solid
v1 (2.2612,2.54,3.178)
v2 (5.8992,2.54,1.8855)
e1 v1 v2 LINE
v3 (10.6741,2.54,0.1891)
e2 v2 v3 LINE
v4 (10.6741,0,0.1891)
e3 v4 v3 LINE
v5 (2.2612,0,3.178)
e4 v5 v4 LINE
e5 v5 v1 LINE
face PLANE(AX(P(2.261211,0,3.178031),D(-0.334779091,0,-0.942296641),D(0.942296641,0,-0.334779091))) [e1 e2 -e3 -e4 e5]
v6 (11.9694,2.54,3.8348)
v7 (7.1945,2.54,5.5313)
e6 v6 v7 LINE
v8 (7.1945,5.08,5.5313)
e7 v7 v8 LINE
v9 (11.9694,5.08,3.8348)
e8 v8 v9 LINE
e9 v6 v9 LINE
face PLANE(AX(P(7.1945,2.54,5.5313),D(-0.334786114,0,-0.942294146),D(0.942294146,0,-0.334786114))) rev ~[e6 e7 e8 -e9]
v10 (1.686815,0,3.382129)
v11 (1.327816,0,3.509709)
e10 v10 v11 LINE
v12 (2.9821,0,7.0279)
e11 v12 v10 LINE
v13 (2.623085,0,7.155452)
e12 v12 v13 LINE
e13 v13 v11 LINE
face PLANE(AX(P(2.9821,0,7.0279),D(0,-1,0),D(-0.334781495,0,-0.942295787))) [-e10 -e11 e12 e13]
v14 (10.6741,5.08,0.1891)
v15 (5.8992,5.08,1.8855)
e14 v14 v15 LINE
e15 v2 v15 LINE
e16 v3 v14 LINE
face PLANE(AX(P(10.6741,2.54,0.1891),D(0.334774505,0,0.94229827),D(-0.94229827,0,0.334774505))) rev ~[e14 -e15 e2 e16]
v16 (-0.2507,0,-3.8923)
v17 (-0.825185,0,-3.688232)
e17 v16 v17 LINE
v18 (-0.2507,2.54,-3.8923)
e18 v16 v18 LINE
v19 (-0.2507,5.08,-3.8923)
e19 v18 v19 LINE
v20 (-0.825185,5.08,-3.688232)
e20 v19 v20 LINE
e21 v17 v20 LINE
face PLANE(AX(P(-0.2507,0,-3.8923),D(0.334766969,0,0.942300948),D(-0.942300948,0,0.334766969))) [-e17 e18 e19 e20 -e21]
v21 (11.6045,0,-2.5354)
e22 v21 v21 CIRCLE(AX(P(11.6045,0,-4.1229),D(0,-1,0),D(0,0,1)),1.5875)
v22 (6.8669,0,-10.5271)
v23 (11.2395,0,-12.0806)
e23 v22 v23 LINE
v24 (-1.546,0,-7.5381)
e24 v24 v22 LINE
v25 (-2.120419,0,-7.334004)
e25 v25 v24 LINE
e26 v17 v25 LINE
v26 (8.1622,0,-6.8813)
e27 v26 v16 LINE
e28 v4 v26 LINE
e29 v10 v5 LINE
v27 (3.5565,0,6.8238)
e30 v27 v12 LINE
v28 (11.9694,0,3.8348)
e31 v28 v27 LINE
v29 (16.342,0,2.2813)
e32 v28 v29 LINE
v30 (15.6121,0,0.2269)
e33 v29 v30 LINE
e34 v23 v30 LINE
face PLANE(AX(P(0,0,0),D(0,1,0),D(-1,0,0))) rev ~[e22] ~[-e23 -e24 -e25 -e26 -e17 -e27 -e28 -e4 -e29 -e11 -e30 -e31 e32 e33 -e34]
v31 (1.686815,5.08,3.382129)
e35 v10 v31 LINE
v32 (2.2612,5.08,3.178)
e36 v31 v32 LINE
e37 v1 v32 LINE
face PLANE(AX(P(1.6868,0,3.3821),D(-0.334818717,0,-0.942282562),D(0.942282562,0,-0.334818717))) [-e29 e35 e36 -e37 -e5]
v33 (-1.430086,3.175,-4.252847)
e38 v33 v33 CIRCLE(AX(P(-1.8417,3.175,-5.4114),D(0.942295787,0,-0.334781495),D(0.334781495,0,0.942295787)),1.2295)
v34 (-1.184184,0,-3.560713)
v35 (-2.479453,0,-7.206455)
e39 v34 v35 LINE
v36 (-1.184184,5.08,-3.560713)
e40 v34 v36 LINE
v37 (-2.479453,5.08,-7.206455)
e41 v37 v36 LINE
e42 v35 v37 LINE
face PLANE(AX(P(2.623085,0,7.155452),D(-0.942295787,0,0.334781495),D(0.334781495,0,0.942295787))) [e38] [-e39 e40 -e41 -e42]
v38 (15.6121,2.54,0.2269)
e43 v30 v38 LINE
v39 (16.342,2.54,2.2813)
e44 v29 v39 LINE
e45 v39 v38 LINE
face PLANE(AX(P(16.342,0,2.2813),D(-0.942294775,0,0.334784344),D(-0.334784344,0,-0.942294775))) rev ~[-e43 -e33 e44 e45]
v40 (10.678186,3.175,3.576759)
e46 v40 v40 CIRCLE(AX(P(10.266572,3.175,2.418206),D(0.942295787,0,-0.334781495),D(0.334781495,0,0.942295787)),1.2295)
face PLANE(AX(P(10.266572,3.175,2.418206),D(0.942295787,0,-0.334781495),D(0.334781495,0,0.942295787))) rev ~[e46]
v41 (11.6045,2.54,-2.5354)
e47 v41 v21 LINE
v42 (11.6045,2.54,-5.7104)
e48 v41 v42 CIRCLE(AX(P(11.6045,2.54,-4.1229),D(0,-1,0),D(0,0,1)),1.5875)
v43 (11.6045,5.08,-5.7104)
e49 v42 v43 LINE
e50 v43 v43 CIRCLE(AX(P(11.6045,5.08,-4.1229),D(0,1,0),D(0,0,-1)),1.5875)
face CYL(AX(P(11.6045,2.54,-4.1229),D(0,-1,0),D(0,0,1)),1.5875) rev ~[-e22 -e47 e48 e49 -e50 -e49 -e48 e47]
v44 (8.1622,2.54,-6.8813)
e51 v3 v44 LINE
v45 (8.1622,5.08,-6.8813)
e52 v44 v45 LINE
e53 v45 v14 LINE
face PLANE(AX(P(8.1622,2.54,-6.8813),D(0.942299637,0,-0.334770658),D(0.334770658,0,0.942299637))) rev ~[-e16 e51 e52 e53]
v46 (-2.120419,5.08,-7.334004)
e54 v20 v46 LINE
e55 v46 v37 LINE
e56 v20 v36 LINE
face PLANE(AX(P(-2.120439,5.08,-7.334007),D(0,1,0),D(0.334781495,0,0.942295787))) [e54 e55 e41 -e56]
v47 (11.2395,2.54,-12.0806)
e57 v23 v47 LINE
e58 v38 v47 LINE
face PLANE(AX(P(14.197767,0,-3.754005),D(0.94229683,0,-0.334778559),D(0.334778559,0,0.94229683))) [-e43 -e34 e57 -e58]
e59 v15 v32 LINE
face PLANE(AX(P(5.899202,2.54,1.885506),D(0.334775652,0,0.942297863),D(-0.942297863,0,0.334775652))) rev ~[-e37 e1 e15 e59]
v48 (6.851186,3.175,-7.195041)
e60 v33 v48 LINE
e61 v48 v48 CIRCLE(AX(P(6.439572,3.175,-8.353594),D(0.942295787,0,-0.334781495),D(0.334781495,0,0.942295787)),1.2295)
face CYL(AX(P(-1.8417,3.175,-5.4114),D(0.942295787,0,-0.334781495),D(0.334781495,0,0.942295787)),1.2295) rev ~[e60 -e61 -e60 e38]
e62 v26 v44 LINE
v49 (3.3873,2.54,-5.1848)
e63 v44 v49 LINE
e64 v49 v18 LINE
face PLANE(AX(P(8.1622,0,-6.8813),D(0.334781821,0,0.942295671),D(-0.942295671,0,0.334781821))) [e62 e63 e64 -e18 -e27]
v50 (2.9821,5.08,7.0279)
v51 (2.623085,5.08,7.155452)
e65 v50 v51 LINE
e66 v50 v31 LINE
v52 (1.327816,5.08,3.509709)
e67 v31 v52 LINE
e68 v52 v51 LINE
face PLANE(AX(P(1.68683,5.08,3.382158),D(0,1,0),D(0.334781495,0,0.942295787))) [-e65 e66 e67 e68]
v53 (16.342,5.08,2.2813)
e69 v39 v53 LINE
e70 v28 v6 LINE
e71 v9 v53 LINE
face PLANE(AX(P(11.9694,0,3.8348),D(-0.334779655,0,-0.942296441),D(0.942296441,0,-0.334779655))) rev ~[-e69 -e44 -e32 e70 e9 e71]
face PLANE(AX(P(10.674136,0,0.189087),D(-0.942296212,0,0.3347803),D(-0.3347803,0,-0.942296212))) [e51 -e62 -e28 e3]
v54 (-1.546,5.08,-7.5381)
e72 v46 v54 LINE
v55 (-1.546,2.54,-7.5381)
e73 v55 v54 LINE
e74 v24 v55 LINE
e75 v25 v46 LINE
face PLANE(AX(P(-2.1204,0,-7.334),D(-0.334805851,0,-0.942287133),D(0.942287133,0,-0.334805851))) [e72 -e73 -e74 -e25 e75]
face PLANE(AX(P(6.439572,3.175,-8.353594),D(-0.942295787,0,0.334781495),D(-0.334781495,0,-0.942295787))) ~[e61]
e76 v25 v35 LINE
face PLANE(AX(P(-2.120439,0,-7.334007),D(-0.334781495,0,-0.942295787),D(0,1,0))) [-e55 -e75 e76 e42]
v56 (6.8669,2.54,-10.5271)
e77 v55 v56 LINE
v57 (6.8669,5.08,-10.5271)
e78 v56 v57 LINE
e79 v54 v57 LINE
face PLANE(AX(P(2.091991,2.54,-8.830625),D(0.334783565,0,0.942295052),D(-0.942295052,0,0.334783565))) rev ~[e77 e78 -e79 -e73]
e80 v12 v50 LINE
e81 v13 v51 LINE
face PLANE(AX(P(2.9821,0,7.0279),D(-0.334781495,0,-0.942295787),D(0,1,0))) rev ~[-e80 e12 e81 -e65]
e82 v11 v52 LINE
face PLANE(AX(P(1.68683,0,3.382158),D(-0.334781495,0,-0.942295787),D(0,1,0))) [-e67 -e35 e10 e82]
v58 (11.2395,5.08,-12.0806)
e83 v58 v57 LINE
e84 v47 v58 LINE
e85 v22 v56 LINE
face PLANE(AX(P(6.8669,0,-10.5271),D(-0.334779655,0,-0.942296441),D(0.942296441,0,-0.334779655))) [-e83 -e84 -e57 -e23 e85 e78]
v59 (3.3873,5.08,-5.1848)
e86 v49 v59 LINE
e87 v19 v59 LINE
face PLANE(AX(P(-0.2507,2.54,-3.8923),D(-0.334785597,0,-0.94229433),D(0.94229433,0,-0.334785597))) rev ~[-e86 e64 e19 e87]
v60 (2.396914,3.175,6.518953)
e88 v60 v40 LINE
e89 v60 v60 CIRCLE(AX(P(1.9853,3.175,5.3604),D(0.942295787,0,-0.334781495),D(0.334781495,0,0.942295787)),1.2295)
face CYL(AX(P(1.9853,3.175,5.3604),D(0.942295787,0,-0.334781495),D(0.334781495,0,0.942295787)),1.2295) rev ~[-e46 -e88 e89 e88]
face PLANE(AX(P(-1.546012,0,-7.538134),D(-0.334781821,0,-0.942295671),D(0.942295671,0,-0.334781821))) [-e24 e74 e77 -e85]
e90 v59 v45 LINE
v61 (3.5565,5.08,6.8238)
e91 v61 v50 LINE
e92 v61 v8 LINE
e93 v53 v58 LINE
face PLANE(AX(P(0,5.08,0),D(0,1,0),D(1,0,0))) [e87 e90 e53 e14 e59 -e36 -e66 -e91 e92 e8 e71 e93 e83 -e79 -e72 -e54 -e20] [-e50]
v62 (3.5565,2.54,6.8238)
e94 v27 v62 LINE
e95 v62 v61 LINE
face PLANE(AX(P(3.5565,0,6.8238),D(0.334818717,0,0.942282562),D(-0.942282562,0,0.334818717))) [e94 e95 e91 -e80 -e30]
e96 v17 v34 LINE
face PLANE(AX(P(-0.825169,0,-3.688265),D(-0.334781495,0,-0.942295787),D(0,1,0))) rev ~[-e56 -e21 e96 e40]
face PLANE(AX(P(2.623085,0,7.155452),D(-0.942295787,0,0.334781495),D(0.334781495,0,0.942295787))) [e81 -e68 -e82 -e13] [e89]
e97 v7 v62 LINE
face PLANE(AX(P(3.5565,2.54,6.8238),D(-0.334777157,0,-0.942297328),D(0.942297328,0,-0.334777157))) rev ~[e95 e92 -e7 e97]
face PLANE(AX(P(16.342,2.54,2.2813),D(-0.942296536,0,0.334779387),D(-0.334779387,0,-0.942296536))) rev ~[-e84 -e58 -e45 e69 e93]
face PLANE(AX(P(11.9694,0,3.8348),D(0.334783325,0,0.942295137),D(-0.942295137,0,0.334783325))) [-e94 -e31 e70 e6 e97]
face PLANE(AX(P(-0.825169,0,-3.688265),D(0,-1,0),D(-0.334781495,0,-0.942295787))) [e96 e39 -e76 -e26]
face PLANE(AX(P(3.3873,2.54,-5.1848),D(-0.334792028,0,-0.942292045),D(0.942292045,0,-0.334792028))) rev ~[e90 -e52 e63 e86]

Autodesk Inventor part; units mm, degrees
ref_plane "YZ Plane" through (0, 0, 0) normal (1, 0, 0) x (0, 1, 0)
ref_plane "XZ Plane" through (0, 0, 0) normal (0, 1, 0) x (-1, 0, 0)
ref_plane "XY Plane" through (0, 0, 0) normal (0, 0, 1) x (1, 0, 0)
sketch "Sketch1" plane through (0, 0, 0) normal (0, 1, 0) x (-1, 0, 0)
  line L0 (6.5094, 9.5985) -> (7.4635, 6.913)
  line L1 (10.1521, -0.6544) -> (11.1062, -3.34)
  line L2 (-11.9694, 3.8348) -> (7.7922, 10.8558)
  line L3 (9.0875, 7.21) -> (-10.6741, 0.1891)
  line L4 (-8.1622, -6.8813) -> (11.5995, 0.1397)
  line L5 (12.8948, -3.5061) -> (-6.8669, -10.5271)
  line L6 (-6.8669, -10.5271) -> (-8.1622, -6.8813)
  line L7 (11.5995, 0.1397) -> (12.8948, -3.5061)
  line L8 (7.7922, 10.8558) -> (9.0875, 7.21)
  line L9 (-10.6741, 0.1891) -> (-11.9694, 3.8348)
  line L10 (6.9865, 8.2558) -> (-11.2395, 1.7804)
  line L11 (10.6292, -1.9972) -> (-7.5968, -8.4726)
  circle A0 centre (-12.8288, -4.5578) radius 1.5875
  line L12 (-12.8288, -4.5578) -> (-11.2395, 1.7804)
  line L13 (-7.5968, -8.4726) -> (-12.8288, -4.5578)
  line L14 (-11.2395, 1.7804) -> (-7.5968, -8.4726)
  line L15 (-6.8669, -10.5271) -> (-11.2395, -12.0806)
  line L16 (-11.2395, -12.0806) -> (-15.6121, 0.2269)
  line L17 (-15.6121, 0.2269) -> (-11.2395, 1.7804)
  line L18 (6.5094, 9.5985) -> (-11.7166, 3.1231)
  line L19 (7.4635, 6.913) -> (-10.7624, 0.4376)
  line L20 (10.1521, -0.6544) -> (-8.0739, -7.1298)
  line L21 (11.1062, -3.34) -> (-7.1197, -9.8154)
  line L22 (11.645, -4.8563) -> (9.3537, 1.5929)
  line L23 (-11.9694, 3.8348) -> (-16.342, 2.2813)
  line L24 (-16.342, 2.2813) -> (-15.6121, 0.2269)
  line L25 (-11.9694, 3.8348) -> (-11.2395, 1.7804)
  line L26 (6.9865, 8.2558) -> (-2.8266, 4.7693)
  line L27 (10.6292, -1.9972) -> (0.8161, -5.4836)
  line L28 (0.8161, -5.4836) -> (1.2932, -6.8264)
  line L29 (0.339, -4.1409) -> (0.8161, -5.4836)
  line L30 (-2.8266, 4.7693) -> (-2.3495, 3.4266)
  line L31 (-2.8266, 4.7693) -> (-3.3037, 6.1121)
  line L32 (-11.9694, 3.8348) -> (-3.5565, 6.8238)
  line L33 (-2.2612, 3.178) -> (-2.3495, 3.4266)
  line L34 (-2.2612, 3.178) -> (-10.6741, 0.1891)
  line L35 (0.339, -4.1409) -> (0.2507, -3.8923)
  line L36 (-8.1622, -6.8813) -> (0.2507, -3.8923)
  line L37 (1.2932, -6.8264) -> (1.546, -7.5381)
  line L38 (-6.8669, -10.5271) -> (1.546, -7.5381)
  line L39 (-6.8669, -10.5271) -> (-7.5968, -8.4726)
  line L40 (-3.3037, 6.1121) -> (-3.5565, 6.8238)
  point P0 (0, 0)
  dimension "d0" = 10.414
  dimension "d1" = 10.414
extrude "Extrusion1" add sketch "Sketch1" along normal blind 2.54 contours L31 L10 L9 L18 | L18 L9 L2 L40 | L30 L19 L9 L10 | L9 L17 L24 L23 | L33 L3 L9 L19 | L9 L14 L6 L13 A0 L12 | L12 A0 L16 L17 | L12 L13 A0 L16 | A0 L13 L12 | L4 L35 L20 L6 | L13 L6 L15 L16 A0 | L20 L29 L11 L6 | L11 L28 L21 L6 | L21 L37 L5 L6
sketch "Sketch2" plane through (0, 2.54, 0) normal (0, 1, 0) x (1, 0, 0)
  line L0 (11.2395, 12.0806) -> (-1.546, 7.5381) projected
  line L1 (-1.546, 7.5381) -> (2.092, 8.8306)
  line L2 (2.092, 8.8306) -> (3.3873, 5.1848)
  line L3 (-0.2507, 3.8923) -> (8.1622, 6.8813) projected
  line L4 (-0.2507, 3.8923) -> (3.3873, 5.1848)
  line L5 (-1.546, 7.5381) -> (-0.2507, 3.8923) projected
  line L6 (-0.2507, 3.8923) -> (-1.546, 7.5381)
  line L7 (2.2612, -3.178) -> (3.5565, -6.8238) projected
  line L8 (2.2612, -3.178) -> (3.5565, -6.8238)
  line L9 (3.5565, -6.8238) -> (7.1945, -5.5313)
  line L10 (3.5565, -6.8238) -> (16.342, -2.2813) projected
  line L11 (7.1945, -5.5313) -> (5.8992, -1.8855)
  line L12 (10.6741, -0.1891) -> (2.2612, -3.178) projected
  line L13 (2.2612, -3.178) -> (5.8992, -1.8855)
  point P0 (0, 0)
  dimension "d4" = 3.8608
  dimension "d5" = 3.8608
extrude "Extrusion2" add sketch "Sketch2" along normal blind 2.54
sketch "Sketch3" plane through (0, 2.54, 0) normal (0, 1, 0) x (1, 0, 0)
  line L0 (8.1622, 6.8813) -> (10.6741, -0.1891) projected
  line L1 (8.1622, 6.8813) -> (6.8669, 10.5271)
  line L2 (11.2395, 12.0806) -> (-1.546, 7.5381) projected
  line L3 (10.6615, -0.1534) -> (11.9694, -3.8348)
  line L4 (7.1945, -5.5313) -> (16.342, -2.2813) projected
  line L5 (6.8669, 10.5271) -> (2.092, 8.8306)
  line L6 (3.3873, 5.1848) -> (8.1622, 6.8813) projected
  line L7 (3.3873, 5.1848) -> (8.1622, 6.8813)
  line L8 (8.1622, 6.8813) -> (3.3873, 5.1848)
  line L9 (3.3873, 5.1848) -> (2.092, 8.8306) projected
  line L10 (2.092, 8.8306) -> (3.3873, 5.1848)
  line L11 (10.6741, -0.1891) -> (5.8992, -1.8855) projected
  line L12 (5.8992, -1.8855) -> (10.6741, -0.1891)
  line L13 (10.6741, -0.1891) -> (11.9694, -3.8348)
  line L14 (5.8992, -1.8855) -> (7.1945, -5.5313) projected
  line L15 (11.9694, -3.8348) -> (7.1945, -5.5313)
  line L16 (7.1945, -5.5313) -> (5.8992, -1.8855)
  point P0 (0, 0)
extrude "Extrusion3" add sketch "Sketch3" along normal blind 2.54
sketch "Sketch6" plane through (0, 2.54, 0) normal (0, 1, 0) x (1, 0, 0)
  line L0 (8.1622, 6.8813) -> (10.6741, -0.1891) projected
  line L1 (8.1622, 6.8813) -> (12.5348, 8.4348)
  line L2 (16.342, -2.2813) -> (11.2395, 12.0806) projected
  line L3 (10.6741, -0.1891) -> (15.0468, 1.3644)
  line L4 (15.0468, 1.3644) -> (12.8604, 0.5877)
  line L5 (10.3485, 7.658) -> (12.8604, 0.5877)
  line L6 (10.3485, 7.658) -> (9.0532, 11.3038)
  line L7 (11.2395, 12.0806) -> (-1.546, 7.5381) projected
  line L8 (12.8604, 0.5877) -> (14.1557, -3.0581)
  line L9 (11.9694, -3.8348) -> (16.342, -2.2813) projected
  circle A0 centre (11.6045, 4.1229) radius 1.4859
  point P0 (0, 0)
  dimension "d28" = 2.9718
hole "Hole3" at (11.6045, 2.54, -4.1229) direction (0, -1, 0) diameter 3.175 depth 7.62
sketch "Sketch7" plane through (0, 2.54, 0) normal (0, 1, 0) x (1, 0, 0)
  circle A0 centre (11.6045, 4.1229) radius 1.5875 projected
  line L0 (10.6741, -0.1891) -> (11.9694, -3.8348) projected
  line L1 (11.9694, -3.8348) -> (16.342, -2.2813) projected
  line L2 (16.342, -2.2813) -> (11.2395, 12.0806) projected
  line L3 (11.2395, 12.0806) -> (6.8669, 10.5271) projected
  line L4 (6.8669, 10.5271) -> (8.1622, 6.8813) projected
  line L5 (8.1622, 6.8813) -> (10.6741, -0.1891) projected
  point P0 (0, 0)
extrude "Extrusion4" add sketch "Sketch7" along normal blind 2.54 contours A0 | L5 L4 L3 L2 L1 L0
sketch "Sketch8" plane through (11.6045, 2.54, -4.1229) normal (0, -1, 0) x (1, 0, 0)
  circle A0 centre (0, 0) radius 1.5875 projected
  point P0 (-11.6045, 4.1229)
hole "Hole4" at (11.6045, 2.54, -4.1229) direction (0, 1, 0) diameter 3.175 depth 7.62
sketch "Sketch9" plane through (0, 0, 0) normal (0, -1, 0) x (1, 0, 0)
  line L0 (3.5565, 6.8238) -> (16.342, 2.2813) projected
  line L1 (10.6741, 0.1891) -> (2.2612, 3.178) projected
  line L2 (-0.2507, -3.8923) -> (8.1622, -6.8813) projected
  line L3 (11.2395, -12.0806) -> (-1.546, -7.5381) projected
  line L4 (3.5565, 6.8238) -> (16.342, 2.2813) projected
  line L5 (3.5565, 6.8238) -> (2.9821, 7.0279)
  line L6 (10.5107, 3.6362) -> (3.3304, 6.1873) projected
  line L7 (2.9821, 7.0279) -> (1.6868, 3.3821)
  line L8 (2.2612, 3.178) -> (3.5565, 6.8238) projected
  line L9 (1.6868, 3.3821) -> (2.2612, 3.178)
  line L10 (-1.546, -7.5381) -> (-0.2507, -3.8923) projected
  line L11 (-0.2507, -3.8923) -> (-0.8252, -3.6882)
  line L12 (-0.8252, -3.6882) -> (-2.1204, -7.334)
  line L13 (-2.1204, -7.334) -> (-1.4728, -7.5641)
  point P0 (0, 0)
  dimension "d45" = 0.6096
extrude "Extrusion5" add sketch "Sketch9" against normal blind 5.08
sketch "Sketch12" plane through (2.9821, 0, 7.0279) normal (-0.9422958, 0, 0.3347815) x (0.3347815, 0, 0.9422958)
  line L0 (0, 0) -> (-3.869, 0) projected
  line L1 (0, 0) -> (0, 5.08) projected
  line L2 (-3.869, 5.08) -> (0, 5.08) projected
  line L3 (-3.869, 0) -> (-3.869, 5.08) projected
  line L4 (-11.3724, 0) -> (-15.2414, 0) projected
  line L5 (-11.3724, 0) -> (-11.3724, 5.08) projected
  line L6 (-15.2414, 5.08) -> (-11.3724, 5.08) projected
  line L7 (-15.2414, 0) -> (-15.2414, 5.08) projected
  point P0 (-7.6207, 0)
extrude "Extrusion6" add sketch "Sketch12" along normal blind 0.381
sketch "Sketch15" plane through (2.6231, 0, 7.1554) normal (-0.9422958, 0, 0.3347815) x (0.3347815, 0, 0.9422958)
  line L0 (-11.3724, 5.08) -> (-15.2414, 5.08) projected
  line L1 (-15.2414, 5.08) -> (-15.2414, 0) projected
  point P0 (-7.6207, 0)
  point P1 (-13.3364, 3.175)
  dimension "d93" = 1.905
  dimension "d94" = 1.905
hole "Hole10" at (-1.8417, 3.175, -5.4114) direction (0.9422958, 0, -0.3347815) diameter 2.459 depth 8.7884 thread size "M3x0.5" class "6H" standard "ISO Metric profile"
sketch "Sketch16" plane through (2.6231, 0, 7.1554) normal (-0.9422958, 0, 0.3347815) x (0.3347815, 0, 0.9422958)
  line L0 (0, 5.08) -> (-3.869, 5.08) projected
  line L1 (0, 0) -> (0, 5.08) projected
  point P0 (-7.6207, 0)
  point P1 (-1.905, 3.175)
  dimension "d102" = 1.905
  dimension "d103" = 1.905
hole "Hole11" at (1.9853, 3.175, 5.3604) direction (0.9422958, 0, -0.3347815) diameter 2.459 depth 8.7884 thread size "M3x0.5" class "6H" standard "ISO Metric profile"
properties part number "fileholddub"
